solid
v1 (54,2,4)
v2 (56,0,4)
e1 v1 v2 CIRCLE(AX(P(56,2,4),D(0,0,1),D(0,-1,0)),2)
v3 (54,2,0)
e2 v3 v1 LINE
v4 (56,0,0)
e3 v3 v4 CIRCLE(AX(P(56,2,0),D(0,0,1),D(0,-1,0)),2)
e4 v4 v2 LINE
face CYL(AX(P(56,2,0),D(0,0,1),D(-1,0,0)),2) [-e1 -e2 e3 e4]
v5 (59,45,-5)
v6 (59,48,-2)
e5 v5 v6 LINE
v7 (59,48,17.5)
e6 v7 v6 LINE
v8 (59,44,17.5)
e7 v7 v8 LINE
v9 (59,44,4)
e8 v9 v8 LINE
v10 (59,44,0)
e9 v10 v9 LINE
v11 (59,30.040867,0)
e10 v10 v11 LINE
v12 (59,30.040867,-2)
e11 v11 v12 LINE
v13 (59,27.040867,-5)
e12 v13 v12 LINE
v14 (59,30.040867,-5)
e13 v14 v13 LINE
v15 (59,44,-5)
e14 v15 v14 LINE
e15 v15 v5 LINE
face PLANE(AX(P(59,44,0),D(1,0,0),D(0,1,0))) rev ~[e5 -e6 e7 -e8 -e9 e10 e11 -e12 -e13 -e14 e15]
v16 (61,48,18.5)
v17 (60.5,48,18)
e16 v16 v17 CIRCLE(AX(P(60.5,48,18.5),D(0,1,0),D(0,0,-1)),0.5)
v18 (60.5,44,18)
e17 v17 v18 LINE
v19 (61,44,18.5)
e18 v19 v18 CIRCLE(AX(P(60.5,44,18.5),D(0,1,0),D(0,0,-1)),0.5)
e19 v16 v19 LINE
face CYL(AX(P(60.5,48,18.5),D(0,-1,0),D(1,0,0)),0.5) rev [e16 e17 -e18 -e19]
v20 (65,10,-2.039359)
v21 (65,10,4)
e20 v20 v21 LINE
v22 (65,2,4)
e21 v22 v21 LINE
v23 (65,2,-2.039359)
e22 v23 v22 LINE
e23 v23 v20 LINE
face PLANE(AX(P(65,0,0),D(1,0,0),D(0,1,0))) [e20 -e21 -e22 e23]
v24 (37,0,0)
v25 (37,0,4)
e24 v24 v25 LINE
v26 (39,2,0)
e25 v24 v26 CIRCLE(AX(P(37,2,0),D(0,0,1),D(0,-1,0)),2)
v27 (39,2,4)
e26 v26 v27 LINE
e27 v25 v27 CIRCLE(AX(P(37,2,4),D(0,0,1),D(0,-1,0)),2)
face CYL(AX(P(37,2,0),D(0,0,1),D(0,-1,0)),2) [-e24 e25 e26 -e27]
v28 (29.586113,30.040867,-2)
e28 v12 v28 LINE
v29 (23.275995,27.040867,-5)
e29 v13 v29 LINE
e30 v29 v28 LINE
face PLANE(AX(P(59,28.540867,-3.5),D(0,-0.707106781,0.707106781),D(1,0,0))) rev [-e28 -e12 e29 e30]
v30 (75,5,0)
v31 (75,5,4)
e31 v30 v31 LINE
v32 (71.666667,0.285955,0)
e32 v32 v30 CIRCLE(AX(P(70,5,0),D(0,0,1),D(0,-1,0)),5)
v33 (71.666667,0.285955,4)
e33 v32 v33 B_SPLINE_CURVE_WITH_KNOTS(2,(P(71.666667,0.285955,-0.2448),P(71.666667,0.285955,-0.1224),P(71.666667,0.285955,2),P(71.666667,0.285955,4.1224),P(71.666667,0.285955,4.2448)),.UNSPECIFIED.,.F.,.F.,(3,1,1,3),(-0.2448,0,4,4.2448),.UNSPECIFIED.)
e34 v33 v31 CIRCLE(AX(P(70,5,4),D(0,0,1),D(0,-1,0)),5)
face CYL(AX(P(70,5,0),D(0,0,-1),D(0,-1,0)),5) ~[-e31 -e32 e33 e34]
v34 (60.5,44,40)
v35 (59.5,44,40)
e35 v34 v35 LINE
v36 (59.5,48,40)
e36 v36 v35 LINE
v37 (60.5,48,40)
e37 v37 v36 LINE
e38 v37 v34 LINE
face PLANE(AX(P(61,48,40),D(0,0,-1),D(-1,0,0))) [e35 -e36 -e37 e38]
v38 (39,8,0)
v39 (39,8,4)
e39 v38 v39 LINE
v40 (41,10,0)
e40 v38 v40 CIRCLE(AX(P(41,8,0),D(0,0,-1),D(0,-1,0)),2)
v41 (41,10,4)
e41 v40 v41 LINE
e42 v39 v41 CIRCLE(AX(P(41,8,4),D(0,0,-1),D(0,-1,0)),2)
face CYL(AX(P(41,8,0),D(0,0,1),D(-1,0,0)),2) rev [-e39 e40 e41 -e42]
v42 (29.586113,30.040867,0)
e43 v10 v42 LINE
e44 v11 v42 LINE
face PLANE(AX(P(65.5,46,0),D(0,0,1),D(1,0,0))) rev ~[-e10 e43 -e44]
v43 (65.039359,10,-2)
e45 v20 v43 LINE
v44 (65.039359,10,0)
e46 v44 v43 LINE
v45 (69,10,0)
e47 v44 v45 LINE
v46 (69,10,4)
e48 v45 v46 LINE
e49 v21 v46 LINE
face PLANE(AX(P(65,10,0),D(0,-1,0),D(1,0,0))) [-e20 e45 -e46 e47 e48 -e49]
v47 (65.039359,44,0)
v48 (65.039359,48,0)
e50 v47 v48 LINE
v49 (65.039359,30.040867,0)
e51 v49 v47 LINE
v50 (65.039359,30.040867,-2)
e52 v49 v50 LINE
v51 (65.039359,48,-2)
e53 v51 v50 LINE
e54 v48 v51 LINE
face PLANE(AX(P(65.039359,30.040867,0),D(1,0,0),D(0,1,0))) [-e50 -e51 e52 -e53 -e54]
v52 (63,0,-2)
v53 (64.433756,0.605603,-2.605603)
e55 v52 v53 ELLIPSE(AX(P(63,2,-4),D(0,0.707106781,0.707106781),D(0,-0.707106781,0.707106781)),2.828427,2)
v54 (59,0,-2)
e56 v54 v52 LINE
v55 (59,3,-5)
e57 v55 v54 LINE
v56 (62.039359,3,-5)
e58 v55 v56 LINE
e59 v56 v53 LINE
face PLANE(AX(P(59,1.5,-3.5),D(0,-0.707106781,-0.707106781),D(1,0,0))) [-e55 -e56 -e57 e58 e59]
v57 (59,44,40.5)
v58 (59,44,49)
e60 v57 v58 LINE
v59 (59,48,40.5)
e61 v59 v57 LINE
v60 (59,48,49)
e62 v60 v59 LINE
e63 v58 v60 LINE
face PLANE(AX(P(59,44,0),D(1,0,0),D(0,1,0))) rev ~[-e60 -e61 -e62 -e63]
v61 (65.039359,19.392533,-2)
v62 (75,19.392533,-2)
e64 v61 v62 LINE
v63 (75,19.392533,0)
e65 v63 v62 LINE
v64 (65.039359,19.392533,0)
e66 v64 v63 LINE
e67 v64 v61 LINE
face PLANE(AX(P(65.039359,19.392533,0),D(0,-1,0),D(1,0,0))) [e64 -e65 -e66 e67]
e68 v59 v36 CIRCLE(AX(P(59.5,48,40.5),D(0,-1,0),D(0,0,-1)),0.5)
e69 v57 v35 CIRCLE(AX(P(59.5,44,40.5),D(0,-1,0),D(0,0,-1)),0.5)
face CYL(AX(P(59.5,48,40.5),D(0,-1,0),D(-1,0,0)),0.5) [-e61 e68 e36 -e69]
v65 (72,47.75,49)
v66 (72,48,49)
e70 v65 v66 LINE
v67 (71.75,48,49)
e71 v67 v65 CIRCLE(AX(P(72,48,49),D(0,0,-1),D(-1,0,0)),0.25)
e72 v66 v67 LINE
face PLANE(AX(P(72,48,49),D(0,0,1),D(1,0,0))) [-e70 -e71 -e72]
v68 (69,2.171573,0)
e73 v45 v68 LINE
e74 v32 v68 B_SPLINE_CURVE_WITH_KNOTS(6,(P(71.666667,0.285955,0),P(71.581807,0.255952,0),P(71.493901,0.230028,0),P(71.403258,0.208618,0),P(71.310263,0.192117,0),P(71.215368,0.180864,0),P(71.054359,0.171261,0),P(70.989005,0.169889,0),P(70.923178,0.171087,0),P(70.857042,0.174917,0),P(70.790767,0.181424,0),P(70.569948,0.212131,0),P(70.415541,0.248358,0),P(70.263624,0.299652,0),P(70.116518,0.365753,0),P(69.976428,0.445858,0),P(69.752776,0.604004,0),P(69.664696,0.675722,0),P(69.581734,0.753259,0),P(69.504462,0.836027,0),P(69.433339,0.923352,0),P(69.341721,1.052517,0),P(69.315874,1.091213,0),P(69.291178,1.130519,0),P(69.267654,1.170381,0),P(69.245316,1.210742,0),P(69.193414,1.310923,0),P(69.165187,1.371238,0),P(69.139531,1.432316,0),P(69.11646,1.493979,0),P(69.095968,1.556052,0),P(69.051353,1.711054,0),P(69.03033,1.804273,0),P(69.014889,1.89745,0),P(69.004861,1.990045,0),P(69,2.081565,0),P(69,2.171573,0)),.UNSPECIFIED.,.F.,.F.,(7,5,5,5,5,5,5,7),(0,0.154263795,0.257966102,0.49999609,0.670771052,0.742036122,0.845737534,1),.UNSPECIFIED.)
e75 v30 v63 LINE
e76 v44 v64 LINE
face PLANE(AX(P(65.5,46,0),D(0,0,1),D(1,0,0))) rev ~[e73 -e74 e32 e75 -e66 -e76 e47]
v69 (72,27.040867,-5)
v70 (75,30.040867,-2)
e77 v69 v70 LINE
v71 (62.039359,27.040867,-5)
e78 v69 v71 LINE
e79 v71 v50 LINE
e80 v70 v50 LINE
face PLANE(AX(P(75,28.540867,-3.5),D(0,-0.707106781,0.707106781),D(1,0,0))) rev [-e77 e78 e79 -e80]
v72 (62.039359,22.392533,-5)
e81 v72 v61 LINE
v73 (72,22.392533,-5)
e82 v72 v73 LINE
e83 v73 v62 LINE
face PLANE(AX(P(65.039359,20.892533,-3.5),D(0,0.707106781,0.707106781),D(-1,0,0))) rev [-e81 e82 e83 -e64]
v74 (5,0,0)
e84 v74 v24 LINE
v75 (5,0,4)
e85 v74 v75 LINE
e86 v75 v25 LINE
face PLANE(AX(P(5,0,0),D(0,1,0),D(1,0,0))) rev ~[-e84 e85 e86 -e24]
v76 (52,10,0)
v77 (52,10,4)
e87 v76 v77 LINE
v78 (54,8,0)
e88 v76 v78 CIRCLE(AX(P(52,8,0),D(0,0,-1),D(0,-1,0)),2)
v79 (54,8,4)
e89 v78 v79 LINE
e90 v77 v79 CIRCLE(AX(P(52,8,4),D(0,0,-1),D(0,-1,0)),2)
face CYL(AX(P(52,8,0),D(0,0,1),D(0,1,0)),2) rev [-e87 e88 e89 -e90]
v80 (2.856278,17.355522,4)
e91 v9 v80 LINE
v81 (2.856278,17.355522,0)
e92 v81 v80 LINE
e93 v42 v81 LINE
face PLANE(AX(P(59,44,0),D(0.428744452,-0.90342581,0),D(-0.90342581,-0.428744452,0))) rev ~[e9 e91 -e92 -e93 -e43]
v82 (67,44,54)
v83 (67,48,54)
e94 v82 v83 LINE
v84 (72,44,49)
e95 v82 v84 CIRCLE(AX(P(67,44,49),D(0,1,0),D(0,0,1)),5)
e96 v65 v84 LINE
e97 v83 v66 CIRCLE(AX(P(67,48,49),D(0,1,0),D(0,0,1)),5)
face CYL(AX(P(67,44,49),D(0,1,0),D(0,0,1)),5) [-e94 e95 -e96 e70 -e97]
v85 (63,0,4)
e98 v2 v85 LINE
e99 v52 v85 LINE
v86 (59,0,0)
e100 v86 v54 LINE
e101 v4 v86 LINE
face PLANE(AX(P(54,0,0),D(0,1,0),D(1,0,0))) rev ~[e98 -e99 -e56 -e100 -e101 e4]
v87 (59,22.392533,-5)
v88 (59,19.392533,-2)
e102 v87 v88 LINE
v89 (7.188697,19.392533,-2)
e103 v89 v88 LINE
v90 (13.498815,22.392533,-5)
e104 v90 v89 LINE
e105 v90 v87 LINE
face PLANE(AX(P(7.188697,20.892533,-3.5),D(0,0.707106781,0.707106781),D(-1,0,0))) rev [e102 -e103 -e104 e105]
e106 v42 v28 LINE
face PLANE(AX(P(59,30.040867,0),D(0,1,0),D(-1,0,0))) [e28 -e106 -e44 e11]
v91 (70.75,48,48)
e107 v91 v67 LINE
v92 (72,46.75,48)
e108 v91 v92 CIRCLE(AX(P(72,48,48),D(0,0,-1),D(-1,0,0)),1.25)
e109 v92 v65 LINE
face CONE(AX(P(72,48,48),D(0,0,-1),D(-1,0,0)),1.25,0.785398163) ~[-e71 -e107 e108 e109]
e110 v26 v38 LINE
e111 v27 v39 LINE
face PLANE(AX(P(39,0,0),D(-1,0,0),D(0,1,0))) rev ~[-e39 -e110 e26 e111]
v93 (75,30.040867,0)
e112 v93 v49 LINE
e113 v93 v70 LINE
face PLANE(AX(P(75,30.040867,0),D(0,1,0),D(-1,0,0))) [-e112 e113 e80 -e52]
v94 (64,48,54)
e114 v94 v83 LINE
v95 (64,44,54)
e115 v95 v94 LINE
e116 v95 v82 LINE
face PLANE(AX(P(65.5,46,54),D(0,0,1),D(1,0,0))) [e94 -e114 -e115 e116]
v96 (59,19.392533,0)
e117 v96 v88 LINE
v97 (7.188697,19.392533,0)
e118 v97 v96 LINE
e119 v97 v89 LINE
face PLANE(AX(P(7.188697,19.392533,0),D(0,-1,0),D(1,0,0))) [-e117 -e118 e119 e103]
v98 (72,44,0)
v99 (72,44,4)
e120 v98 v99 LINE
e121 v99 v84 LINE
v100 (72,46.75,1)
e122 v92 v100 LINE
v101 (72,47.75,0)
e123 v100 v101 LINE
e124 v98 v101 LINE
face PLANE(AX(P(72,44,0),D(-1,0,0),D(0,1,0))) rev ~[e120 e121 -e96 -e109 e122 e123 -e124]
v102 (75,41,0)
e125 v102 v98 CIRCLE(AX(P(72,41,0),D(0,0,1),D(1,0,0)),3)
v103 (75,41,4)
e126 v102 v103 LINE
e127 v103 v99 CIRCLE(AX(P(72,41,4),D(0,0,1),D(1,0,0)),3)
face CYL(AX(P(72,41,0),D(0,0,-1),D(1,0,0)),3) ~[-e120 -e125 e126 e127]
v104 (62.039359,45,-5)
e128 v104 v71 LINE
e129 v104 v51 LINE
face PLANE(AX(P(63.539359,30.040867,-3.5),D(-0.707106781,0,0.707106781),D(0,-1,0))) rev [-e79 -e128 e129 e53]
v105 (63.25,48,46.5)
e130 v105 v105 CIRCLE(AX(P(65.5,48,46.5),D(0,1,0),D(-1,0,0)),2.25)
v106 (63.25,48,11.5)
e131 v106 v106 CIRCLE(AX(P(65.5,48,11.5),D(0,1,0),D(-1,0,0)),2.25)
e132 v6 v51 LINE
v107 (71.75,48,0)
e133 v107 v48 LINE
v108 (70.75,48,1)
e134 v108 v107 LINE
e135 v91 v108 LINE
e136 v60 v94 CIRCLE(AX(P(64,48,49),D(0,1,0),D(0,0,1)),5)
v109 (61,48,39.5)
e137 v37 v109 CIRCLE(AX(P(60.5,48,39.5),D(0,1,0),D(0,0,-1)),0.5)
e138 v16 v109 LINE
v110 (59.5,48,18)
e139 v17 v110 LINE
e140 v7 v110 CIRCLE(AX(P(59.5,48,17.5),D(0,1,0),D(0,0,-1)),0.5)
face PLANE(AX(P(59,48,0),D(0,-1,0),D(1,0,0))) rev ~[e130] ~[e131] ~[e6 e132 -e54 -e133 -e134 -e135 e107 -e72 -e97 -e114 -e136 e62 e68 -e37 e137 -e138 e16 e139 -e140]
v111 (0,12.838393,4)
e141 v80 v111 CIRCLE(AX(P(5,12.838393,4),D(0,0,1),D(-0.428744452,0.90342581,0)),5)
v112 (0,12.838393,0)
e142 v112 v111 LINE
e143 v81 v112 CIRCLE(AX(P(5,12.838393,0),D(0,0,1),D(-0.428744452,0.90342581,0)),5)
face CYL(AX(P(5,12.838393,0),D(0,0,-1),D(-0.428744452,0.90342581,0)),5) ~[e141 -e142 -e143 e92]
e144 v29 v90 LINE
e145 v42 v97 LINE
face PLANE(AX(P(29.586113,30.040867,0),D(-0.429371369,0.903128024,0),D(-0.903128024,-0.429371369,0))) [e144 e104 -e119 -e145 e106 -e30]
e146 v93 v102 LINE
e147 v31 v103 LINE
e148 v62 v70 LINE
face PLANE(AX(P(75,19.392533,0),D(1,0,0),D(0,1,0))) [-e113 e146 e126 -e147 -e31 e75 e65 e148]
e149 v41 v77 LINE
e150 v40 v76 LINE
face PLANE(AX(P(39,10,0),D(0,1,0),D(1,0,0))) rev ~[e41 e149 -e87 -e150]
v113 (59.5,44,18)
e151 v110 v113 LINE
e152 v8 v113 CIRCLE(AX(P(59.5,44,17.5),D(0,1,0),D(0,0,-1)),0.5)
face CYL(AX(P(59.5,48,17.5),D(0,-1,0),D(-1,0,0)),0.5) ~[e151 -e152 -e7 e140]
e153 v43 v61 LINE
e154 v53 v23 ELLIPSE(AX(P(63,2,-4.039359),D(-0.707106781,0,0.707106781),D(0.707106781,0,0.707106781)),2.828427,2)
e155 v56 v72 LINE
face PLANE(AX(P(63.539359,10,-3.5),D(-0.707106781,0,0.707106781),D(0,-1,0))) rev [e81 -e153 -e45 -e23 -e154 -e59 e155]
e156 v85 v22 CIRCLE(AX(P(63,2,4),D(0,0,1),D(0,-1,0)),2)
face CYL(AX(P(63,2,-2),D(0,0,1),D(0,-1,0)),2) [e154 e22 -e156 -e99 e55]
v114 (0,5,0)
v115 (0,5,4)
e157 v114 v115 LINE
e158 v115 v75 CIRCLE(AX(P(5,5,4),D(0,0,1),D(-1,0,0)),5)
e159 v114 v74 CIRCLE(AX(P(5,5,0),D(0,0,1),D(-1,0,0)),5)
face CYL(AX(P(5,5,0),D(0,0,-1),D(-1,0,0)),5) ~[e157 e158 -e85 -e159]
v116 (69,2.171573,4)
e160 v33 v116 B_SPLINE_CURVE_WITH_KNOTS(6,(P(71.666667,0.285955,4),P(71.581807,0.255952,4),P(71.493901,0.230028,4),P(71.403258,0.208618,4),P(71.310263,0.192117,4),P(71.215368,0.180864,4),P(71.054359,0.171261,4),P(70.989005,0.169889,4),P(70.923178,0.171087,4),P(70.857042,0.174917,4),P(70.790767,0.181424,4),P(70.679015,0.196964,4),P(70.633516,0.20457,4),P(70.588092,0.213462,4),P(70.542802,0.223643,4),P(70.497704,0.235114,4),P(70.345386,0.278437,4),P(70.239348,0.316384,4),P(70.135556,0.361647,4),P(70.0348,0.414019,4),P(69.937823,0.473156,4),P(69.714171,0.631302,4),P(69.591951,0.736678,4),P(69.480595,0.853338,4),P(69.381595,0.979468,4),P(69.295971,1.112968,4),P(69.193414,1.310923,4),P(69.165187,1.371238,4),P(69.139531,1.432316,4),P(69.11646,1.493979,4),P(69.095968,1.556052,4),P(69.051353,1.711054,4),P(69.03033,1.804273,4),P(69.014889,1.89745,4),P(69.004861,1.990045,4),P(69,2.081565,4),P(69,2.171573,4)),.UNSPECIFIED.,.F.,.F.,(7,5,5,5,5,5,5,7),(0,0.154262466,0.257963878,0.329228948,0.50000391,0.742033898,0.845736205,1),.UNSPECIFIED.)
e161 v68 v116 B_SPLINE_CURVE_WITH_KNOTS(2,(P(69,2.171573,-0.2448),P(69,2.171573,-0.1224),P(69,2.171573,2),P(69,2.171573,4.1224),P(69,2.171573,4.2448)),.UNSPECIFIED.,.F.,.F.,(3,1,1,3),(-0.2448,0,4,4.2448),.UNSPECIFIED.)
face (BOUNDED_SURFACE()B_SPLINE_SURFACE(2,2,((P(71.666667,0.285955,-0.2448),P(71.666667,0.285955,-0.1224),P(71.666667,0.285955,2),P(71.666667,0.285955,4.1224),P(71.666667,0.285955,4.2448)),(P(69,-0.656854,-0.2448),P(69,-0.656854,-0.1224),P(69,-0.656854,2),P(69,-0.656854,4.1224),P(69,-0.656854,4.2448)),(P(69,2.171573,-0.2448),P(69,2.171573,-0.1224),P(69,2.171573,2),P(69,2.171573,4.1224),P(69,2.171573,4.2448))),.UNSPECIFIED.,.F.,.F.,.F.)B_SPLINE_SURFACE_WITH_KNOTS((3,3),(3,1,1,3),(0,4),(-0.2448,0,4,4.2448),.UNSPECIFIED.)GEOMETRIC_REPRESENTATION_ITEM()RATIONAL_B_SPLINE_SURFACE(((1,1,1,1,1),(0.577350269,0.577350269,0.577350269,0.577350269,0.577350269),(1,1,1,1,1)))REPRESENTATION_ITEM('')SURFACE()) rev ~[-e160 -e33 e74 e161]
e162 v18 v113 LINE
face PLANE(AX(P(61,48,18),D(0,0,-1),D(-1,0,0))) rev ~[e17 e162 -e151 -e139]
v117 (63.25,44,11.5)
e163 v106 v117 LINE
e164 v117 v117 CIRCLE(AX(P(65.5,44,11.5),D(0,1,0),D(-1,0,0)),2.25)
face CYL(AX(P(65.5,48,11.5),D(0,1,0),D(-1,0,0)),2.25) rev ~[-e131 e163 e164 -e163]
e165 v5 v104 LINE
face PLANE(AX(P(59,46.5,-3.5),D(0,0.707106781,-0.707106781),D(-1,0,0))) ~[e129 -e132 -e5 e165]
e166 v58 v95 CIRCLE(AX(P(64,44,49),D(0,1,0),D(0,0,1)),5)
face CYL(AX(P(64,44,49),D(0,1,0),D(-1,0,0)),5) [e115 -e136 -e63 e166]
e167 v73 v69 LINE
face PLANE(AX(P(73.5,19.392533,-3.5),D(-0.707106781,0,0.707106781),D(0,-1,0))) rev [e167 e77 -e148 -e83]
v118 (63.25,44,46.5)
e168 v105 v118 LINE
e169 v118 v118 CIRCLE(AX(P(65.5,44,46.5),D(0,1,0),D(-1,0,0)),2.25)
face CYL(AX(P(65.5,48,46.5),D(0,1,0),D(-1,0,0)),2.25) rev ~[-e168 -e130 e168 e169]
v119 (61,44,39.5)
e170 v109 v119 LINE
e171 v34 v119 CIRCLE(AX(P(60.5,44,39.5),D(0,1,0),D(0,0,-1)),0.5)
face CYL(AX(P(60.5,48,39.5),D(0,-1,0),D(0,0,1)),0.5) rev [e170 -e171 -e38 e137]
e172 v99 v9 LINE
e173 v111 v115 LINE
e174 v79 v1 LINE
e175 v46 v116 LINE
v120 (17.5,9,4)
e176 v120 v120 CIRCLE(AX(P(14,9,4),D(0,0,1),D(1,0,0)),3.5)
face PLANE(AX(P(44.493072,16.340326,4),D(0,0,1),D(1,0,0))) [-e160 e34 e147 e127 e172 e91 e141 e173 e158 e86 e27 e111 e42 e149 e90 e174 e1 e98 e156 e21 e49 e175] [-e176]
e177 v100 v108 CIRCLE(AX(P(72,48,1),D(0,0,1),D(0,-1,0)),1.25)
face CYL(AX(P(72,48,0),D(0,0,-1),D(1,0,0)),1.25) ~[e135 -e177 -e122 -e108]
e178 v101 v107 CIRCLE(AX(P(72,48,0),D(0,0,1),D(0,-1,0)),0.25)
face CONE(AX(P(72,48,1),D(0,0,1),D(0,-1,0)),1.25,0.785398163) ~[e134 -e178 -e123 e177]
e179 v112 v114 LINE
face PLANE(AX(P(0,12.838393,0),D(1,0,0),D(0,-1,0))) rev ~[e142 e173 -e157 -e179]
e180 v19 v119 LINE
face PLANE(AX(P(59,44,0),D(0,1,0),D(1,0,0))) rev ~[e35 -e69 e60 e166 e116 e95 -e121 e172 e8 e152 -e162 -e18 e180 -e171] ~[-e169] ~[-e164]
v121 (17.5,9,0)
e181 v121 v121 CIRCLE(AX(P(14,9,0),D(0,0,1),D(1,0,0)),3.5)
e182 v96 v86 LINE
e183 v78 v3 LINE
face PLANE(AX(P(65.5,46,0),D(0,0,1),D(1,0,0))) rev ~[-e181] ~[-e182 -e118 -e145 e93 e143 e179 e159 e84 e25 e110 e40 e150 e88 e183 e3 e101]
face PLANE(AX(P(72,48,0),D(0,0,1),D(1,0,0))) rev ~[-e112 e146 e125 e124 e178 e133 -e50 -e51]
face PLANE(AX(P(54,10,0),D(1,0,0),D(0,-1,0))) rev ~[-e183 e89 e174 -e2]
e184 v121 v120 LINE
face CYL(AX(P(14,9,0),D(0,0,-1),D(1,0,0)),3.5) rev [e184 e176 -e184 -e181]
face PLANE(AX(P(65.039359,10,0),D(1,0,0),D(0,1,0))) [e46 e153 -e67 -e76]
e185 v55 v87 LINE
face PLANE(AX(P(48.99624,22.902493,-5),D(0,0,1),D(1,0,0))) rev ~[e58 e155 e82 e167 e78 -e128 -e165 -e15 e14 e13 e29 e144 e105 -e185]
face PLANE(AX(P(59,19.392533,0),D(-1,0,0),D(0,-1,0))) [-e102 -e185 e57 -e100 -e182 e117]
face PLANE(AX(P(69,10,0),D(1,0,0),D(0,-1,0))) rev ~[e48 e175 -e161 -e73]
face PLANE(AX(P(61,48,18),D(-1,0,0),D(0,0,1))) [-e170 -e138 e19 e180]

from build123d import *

# Parameters (mm, degrees)
F0_R      = 3.5
F1_DEPTH  = 4
F0_W      = 13
F0_H      = 4
F2_DEPTH  = 54
F3_R      = 5
F4_W      = 6.0393586755
F4_H      = 4
F5_DEPTH  = 5
F6_SIZE   = 3
F4_R      = 1.25
F7_DEPTH  = 49
F8_SIZE   = 1
F9_SIZE   = 1
F10_R     = 2.25
F11_DEPTH = 5
F12_R     = 2
F13_W     = 2
F13_H     = 22
F14_DEPTH = 5
F15_R     = 0.5


with BuildPart() as f1:
    # F0 (on Top) → F1 (new body)
    with BuildSketch(Plane.XY):
        with BuildLine():
            ThreePointArc((0, 5), (1.4644660941, 1.4644660941), (5, 0))
            Line((5, 0), (39, 0))
            Line((39, 0), (39, 10))
            Line((39, 10), (54, 10))
            Line((54, 10), (54, 0))
            Line((54, 0), (65, 0))
            Line((65, 0), (65, 10))
            Line((65, 10), (69, 10))
            Line((69, 10), (69, 0))
            Line((69, 0), (70, 0))
            ThreePointArc((70, 0), (73.5355339059, 1.4644660941), (75, 5))
            Line((75, 5), (75, 41))
            ThreePointArc((75, 41), (74.1213203436, 43.1213203436), (72, 44))
            Line((72, 44), (59, 44))
            Line((59, 44), (2.8562777384, 17.3555216386))
            ThreePointArc((2.8562777384, 17.3555216386), (0.7739728285, 15.5106003536), (0, 12.8383925874))
            Line((0, 12.8383925874), (0, 5))
        make_face()
        with Locations((14, 9)):
            Circle(F0_R, mode=Mode.SUBTRACT)
    extrude(amount=F1_DEPTH)

    # F0 (on Top) → F2 (join)
    with BuildSketch(Plane.XY):
        with Locations((65.5, 46)):
            Rectangle(F0_W, F0_H)
    extrude(amount=F2_DEPTH)

    # F3
    f3_edges = [f1.edges().sort_by_distance(p)[0] for p in [
        (72, 46, 54),
        (59, 46, 54),
    ]]
    fillet(f3_edges, radius=F3_R)

    # F4 (on face) → F5 (join)
    with BuildSketch(Plane.XY):
        Polygon((29.5861130485, 30.0408672094), (7.1886969879, 19.3925328106), (59, 19.3925328106), (59, 0), (65, 0), (65, 10), (65.0393586755, 10), (65.0393586755, 19.3925328106), (75, 19.3925328106), (75, 30.0408672094), (65.0393586755, 30.0408672094), (65.0393586755, 44), (59, 44), (59, 30.0408672094), align=None)
        with Locations((62.0196793377, 46)):
            Rectangle(F4_W, F4_H)
    extrude(amount=-F5_DEPTH)

    # F6 (call 1 of 4: OpenCascade refuses the feature's edges together)
    f6_edges = [f1.edges().sort_by_distance(p)[0] for p in [
        (62.019679, 48, -5),
        (75, 24.7167, -5),
        (70.019679, 30.040867, -5),
        (70.019679, 19.392533, -5),
        (65.039359, 39.020434, -5),
        (65.039359, 14.696266, -5),
    ]]
    chamfer(f6_edges, length=F6_SIZE)

    # F6#2 (call 2 of 4)
    f6_2_edges = [f1.edges().sort_by_distance(p)[0] for p in [
        (62, 0, -5),
    ]]
    chamfer(f6_2_edges, length=F6_SIZE)

    # F6#3 (call 3 of 4)
    f6_3_edges = [f1.edges().sort_by_distance(p)[0] for p in [
        (44.293057, 30.040867, -5),
    ]]
    chamfer(f6_3_edges, length=F6_SIZE)

    # F6#4 (call 4 of 4)
    f6_4_edges = [f1.edges().sort_by_distance(p)[0] for p in [
        (33.094348, 19.392533, -5),
    ]]
    chamfer(f6_4_edges, length=F6_SIZE)

    # F4 (on face) → F7 (join)
    with BuildSketch(Plane.XY):
        with Locations((72, 48)):
            Circle(F4_R)
    extrude(amount=F7_DEPTH)

    # F8
    f8_edges = [f1.edges().sort_by_distance(p)[0] for p in [
        (72.883883, 48.883883, 49),
    ]]
    chamfer(f8_edges, length=F8_SIZE)

    # F9
    f9_edges = [f1.edges().sort_by_distance(p)[0] for p in [
        (72.883883, 48.883883, 0),
    ]]
    chamfer(f9_edges, length=F9_SIZE)

    # F10 (on face) → F11 (cut)
    with BuildSketch(Plane(origin=(0, 48, 0), x_dir=(-1, 0, 0), z_dir=(0, 1, 0))):
        with Locations((-65.5, 11.5)):
            Circle(F10_R)
        with Locations((-65.5, 46.5)):
            Circle(F10_R)
    extrude(amount=-F11_DEPTH, mode=Mode.SUBTRACT)

    # F12
    f12_edges = [f1.edges().sort_by_distance(p)[0] for p in [
        (54, 10, 2),
        (54, 0, 2),
        (39, 10, 2),
        (39, 0, 2),
        (65, 0, 1),
        (69, 0, 2),
    ]]
    fillet(f12_edges, radius=F12_R)

    # F13 (on face) → F14 (cut)
    with BuildSketch(Plane(origin=(0, 48, 0), x_dir=(-1, 0, 0), z_dir=(0, 1, 0))):
        with Locations((-60, 29)):
            Rectangle(F13_W, F13_H)
    extrude(amount=-F14_DEPTH, mode=Mode.SUBTRACT)

    # F15
    f15_edges = [f1.edges().sort_by_distance(p)[0] for p in [
        (59, 46, 40),
        (59, 46, 18),
        (61, 46, 18),
        (61, 46, 40),
    ]]
    fillet(f15_edges, radius=F15_R)


solid = f1.part
